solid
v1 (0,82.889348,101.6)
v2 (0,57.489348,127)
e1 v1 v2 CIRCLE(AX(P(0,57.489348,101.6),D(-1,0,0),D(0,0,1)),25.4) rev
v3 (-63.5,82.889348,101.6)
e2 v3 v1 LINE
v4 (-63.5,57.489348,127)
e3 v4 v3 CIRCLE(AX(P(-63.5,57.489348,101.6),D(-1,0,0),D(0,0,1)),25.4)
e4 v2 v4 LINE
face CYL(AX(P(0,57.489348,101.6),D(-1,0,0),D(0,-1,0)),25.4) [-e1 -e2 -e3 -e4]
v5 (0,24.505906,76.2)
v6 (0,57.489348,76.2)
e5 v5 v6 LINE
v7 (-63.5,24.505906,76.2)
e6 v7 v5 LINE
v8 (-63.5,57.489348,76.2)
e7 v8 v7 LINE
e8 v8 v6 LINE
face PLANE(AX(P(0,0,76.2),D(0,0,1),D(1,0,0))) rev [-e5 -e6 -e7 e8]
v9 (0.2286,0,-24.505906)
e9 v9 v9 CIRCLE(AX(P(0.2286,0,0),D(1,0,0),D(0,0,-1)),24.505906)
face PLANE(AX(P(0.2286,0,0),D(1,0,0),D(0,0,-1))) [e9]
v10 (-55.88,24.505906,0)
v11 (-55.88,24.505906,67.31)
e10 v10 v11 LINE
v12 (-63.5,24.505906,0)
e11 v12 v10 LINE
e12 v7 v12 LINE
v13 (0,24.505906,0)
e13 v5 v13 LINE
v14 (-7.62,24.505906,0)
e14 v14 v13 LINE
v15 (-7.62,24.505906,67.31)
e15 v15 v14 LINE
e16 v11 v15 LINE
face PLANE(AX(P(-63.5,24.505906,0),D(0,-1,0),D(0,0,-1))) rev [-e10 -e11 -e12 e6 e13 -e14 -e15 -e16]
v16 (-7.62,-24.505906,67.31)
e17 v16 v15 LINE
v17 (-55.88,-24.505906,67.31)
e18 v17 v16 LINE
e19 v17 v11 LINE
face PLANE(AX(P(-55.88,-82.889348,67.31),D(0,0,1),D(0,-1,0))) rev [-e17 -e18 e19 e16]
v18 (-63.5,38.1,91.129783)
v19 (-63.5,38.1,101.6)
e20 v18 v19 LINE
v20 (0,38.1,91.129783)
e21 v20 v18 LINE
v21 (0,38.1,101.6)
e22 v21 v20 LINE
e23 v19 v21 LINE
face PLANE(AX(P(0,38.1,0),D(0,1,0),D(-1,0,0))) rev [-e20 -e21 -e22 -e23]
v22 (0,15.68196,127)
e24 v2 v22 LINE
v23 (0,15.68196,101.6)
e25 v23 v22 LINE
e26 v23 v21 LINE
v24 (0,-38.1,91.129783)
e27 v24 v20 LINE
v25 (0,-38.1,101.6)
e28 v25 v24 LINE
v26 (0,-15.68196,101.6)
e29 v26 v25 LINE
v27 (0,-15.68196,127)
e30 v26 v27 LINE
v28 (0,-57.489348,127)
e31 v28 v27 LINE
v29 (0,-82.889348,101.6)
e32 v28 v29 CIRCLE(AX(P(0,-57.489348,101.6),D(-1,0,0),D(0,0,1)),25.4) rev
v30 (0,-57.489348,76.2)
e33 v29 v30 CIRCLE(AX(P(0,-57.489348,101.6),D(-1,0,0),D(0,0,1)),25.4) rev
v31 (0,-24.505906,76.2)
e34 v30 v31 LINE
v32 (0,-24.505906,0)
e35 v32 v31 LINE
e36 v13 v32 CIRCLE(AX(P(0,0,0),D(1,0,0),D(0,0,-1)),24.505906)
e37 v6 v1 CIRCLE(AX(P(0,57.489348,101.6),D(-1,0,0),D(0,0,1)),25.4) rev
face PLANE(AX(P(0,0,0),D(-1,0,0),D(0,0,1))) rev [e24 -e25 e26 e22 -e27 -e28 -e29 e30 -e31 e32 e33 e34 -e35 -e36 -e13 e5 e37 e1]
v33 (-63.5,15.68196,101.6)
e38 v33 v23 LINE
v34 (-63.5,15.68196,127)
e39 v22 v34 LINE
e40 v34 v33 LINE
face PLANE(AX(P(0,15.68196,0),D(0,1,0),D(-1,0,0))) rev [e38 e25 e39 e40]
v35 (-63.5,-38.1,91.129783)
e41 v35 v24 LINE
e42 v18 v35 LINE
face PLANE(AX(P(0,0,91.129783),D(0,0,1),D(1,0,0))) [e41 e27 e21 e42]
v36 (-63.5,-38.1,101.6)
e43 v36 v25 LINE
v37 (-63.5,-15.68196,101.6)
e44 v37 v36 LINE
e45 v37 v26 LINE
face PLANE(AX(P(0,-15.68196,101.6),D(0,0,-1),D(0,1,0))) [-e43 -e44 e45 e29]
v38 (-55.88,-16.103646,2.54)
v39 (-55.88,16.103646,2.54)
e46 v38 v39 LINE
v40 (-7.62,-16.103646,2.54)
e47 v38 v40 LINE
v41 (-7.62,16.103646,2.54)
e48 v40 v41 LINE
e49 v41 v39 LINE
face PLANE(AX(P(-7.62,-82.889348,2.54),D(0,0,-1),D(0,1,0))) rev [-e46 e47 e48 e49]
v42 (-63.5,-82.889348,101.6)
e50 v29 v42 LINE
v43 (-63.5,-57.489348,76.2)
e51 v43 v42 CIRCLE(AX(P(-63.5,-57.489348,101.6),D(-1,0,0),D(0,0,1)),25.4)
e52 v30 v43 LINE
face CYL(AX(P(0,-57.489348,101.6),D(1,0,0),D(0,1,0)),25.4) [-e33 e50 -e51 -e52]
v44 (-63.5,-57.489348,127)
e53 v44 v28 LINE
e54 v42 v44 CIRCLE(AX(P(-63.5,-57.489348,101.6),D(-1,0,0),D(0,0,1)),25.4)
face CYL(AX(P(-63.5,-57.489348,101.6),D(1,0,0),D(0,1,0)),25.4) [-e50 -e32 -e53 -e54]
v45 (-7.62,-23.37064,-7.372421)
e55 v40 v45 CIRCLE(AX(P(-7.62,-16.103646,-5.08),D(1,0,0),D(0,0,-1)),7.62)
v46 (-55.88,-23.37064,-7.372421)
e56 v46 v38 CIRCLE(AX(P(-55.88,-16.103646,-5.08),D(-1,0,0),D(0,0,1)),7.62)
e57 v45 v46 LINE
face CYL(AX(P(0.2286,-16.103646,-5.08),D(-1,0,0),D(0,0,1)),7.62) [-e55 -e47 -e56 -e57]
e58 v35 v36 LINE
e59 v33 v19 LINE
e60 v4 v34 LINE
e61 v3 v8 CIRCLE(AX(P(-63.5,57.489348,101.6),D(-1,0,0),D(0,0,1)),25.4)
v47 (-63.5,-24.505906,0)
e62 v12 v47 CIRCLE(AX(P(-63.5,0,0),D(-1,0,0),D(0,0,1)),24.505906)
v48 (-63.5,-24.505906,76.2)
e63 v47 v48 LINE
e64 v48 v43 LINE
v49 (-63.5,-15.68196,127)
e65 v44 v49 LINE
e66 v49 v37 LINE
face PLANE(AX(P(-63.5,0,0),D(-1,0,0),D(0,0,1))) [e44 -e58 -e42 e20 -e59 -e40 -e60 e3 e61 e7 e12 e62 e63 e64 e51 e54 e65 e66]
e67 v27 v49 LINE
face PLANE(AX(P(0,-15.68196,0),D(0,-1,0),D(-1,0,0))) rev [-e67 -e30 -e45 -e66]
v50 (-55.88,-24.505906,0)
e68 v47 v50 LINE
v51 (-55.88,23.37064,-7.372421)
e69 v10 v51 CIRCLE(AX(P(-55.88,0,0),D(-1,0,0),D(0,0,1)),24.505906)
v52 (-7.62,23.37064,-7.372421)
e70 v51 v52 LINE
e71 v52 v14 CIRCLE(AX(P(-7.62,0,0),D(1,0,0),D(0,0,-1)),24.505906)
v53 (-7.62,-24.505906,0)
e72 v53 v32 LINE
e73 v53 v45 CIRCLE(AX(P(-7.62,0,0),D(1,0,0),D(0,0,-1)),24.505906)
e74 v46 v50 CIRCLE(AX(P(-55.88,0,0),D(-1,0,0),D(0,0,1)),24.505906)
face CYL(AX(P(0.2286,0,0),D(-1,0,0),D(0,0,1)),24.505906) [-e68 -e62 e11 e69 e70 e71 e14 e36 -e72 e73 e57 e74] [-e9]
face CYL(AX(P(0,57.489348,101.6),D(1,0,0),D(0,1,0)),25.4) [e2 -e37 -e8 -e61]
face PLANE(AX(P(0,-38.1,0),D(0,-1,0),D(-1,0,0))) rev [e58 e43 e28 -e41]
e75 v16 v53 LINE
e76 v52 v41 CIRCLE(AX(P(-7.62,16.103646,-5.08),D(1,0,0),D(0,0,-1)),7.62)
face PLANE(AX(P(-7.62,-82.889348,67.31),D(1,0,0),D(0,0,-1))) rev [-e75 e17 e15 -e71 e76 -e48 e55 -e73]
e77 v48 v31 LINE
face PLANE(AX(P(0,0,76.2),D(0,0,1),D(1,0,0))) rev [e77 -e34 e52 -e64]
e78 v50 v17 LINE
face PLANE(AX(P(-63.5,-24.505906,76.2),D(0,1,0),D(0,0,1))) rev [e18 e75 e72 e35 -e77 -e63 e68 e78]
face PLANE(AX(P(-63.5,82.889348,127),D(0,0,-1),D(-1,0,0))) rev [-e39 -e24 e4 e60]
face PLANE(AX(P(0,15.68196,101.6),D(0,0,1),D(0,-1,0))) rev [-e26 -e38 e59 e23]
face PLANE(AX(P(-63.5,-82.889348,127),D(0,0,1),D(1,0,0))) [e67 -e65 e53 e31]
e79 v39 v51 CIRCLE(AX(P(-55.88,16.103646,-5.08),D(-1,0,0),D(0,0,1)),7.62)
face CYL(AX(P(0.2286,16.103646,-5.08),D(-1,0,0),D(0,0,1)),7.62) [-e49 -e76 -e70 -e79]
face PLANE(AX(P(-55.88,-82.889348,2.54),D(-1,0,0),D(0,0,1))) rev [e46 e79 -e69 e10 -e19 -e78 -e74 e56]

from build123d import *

# Parameters (mm, degrees)
SKETCH1_R            = 24.505905818
BOSS_EXTRUDE1_DEPTH  = 0.2286
BOSS_EXTRUDE2_START  = 63.5
BOSS_EXTRUDE2_DEPTH  = 63.5
SKETCH4_W            = 63.5
SKETCH4_H            = 76.2
BOSS_EXTRUDE4_DEPTH  = 14.929782549
SKETCH5_W            = 63.5
SKETCH5_H            = 50.8
BOSS_EXTRUDE5_DEPTH  = 44.789347647
FILLET2_R            = 25.4
SKETCH7_W            = 63.5
SKETCH7_H            = 25.4
BOSS_EXTRUDE7_DEPTH  = 22.41804
FILLET2_OF_MIRROR1_R = 25.4
SKETCH10_W           = 48.26
SKETCH10_H           = 64.77
CUT_EXTRUDE2_DEPTH   = 179.030869421
FILLET3_R            = 7.62


# Some blends are built 0.0001 mm under size
with BuildPart() as part:
    # Sketch1 → Boss-Extrude1 (new body)
    with BuildSketch(Plane.YZ):
        with Locations(Location((0, 0, 0), (0, 0, 270))):
            Circle(SKETCH1_R)
    extrude(amount=BOSS_EXTRUDE1_DEPTH)

    # Sketch2 → Boss-Extrude2 (add)
    with BuildSketch(Plane(origin=(0, 0, 0), x_dir=(0, -1, 0), z_dir=(-1, 0, 0)).offset(BOSS_EXTRUDE2_START)):
        with BuildLine():
            Line((-24.505905818, 0), (-24.505905818, 76.2))
            Line((-24.505905818, 76.2), (24.505905818, 76.2))
            Line((24.505905818, 76.2), (24.505905818, 0))
            ThreePointArc((24.505905818, 0), (0, -24.505905818), (-24.505905818, 0))
        make_face()
    extrude(amount=-BOSS_EXTRUDE2_DEPTH)

    # Sketch4 → Boss-Extrude4 (add)
    with BuildSketch(Plane.XY.offset(76.2)):
        with Locations((-31.75, 0)):
            Rectangle(SKETCH4_W, SKETCH4_H)
    extrude(amount=BOSS_EXTRUDE4_DEPTH)

    # Sketch5 → Boss-Extrude5 (add)
    with BuildSketch(Plane(origin=(0, 38.1, 0), x_dir=(-1, 0, 0), z_dir=(0, 1, 0))):
        with Locations((31.75, 101.6)):
            Rectangle(SKETCH5_W, SKETCH5_H)
    boss_extrude5 = extrude(amount=BOSS_EXTRUDE5_DEPTH)

    # Fillet2
    fillet2_edges = [part.edges().sort_by_distance(p)[0] for p in [
        (-31.75, 82.889347647, 76.2),
        (-31.75, 82.889347647, 127),
    ]]
    fillet(fillet2_edges, radius=FILLET2_R - 0.0001)  # a hair under: the kernel refuses the full size

    # Sketch7 → Boss-Extrude7 (add)
    with BuildSketch(Plane.XZ.offset(-38.1)):
        with Locations((-31.75, 114.3)):
            Rectangle(SKETCH7_W, SKETCH7_H)
    boss_extrude7 = extrude(amount=BOSS_EXTRUDE7_DEPTH)

    # Mirror1: Boss-Extrude5, Boss-Extrude7 across plane
    add(boss_extrude5.mirror(Plane.ZX))
    add(boss_extrude7.mirror(Plane.ZX))

    # Fillet2 of Mirror1
    fillet2_of_mirror1_edges = [part.edges().sort_by_distance(p)[0] for p in [
        (-31.75, -82.889347647, 76.2),
        (-31.75, -82.889347647, 127),
    ]]
    fillet(fillet2_of_mirror1_edges, radius=FILLET2_OF_MIRROR1_R - 0.0001)  # a hair under: the kernel refuses the full size

    # Sketch10 → Cut-Extrude2 (cut, through all)
    with BuildSketch(Plane(origin=(0, 24.505905818, 0), x_dir=(-1, 0, 0), z_dir=(0, 1, 0))):
        with Locations((31.75, 34.925)):
            Rectangle(SKETCH10_W, SKETCH10_H)
    extrude(amount=-CUT_EXTRUDE2_DEPTH, mode=Mode.SUBTRACT)

    # Fillet3
    # the kernel refuses this fillet: 7.62 mm, written as the material it takes off along each edge
    with BuildSketch(Plane(origin=(-7.62, -24.505905818, 2.54), x_dir=(0, 0.11378574923272014, -0.9935053111441069), z_dir=(-1, 0, 0))) as fillet3_piece_1:
        with BuildLine():
            CenterArc((8.526567897, -7.480642321), FILLET3_R, 79.025374556, 107.50821933)
            Line((0.956057426, -8.34768973), (0.199006379, -8.434394471))
            Line((0.199006379, -8.434394471), (-0.757051047, -0.086704741))
            Line((-0.757051047, -0.086704741), (-0.086704741, 0.757051047))
            ThreePointArc((-0.086704741, 0.757051047), (2.436798749, 1.04606685), (10.122284809, 0.748064232))
            Line((10.122284809, 0.748064232), (9.977219635, 0))
        make_face()
    extrude(amount=48.26, mode=Mode.SUBTRACT)
    with BuildSketch(Plane(origin=(-7.62, 24.505905818, 2.54), x_dir=(0, -0.11378574923272022, -0.9935053111441069), z_dir=(-1, 0, 0))) as fillet3_piece_2:
        with BuildLine():
            CenterArc((8.526567897, 7.480642321), FILLET3_R, 173.466406113, 107.50821933)
            Line((0.956057426, 8.34768973), (0.199006379, 8.434394471))
            Line((0.199006379, 8.434394471), (-0.757051047, 0.086704741))
            Line((-0.757051047, 0.086704741), (-0.086704741, -0.757051047))
            ThreePointArc((-0.086704741, -0.757051047), (2.436798749, -1.04606685), (10.122284809, -0.748064232))
            Line((10.122284809, -0.748064232), (9.977219635, 0))
        make_face()
    extrude(amount=48.26, mode=Mode.SUBTRACT)


solid = part.part
